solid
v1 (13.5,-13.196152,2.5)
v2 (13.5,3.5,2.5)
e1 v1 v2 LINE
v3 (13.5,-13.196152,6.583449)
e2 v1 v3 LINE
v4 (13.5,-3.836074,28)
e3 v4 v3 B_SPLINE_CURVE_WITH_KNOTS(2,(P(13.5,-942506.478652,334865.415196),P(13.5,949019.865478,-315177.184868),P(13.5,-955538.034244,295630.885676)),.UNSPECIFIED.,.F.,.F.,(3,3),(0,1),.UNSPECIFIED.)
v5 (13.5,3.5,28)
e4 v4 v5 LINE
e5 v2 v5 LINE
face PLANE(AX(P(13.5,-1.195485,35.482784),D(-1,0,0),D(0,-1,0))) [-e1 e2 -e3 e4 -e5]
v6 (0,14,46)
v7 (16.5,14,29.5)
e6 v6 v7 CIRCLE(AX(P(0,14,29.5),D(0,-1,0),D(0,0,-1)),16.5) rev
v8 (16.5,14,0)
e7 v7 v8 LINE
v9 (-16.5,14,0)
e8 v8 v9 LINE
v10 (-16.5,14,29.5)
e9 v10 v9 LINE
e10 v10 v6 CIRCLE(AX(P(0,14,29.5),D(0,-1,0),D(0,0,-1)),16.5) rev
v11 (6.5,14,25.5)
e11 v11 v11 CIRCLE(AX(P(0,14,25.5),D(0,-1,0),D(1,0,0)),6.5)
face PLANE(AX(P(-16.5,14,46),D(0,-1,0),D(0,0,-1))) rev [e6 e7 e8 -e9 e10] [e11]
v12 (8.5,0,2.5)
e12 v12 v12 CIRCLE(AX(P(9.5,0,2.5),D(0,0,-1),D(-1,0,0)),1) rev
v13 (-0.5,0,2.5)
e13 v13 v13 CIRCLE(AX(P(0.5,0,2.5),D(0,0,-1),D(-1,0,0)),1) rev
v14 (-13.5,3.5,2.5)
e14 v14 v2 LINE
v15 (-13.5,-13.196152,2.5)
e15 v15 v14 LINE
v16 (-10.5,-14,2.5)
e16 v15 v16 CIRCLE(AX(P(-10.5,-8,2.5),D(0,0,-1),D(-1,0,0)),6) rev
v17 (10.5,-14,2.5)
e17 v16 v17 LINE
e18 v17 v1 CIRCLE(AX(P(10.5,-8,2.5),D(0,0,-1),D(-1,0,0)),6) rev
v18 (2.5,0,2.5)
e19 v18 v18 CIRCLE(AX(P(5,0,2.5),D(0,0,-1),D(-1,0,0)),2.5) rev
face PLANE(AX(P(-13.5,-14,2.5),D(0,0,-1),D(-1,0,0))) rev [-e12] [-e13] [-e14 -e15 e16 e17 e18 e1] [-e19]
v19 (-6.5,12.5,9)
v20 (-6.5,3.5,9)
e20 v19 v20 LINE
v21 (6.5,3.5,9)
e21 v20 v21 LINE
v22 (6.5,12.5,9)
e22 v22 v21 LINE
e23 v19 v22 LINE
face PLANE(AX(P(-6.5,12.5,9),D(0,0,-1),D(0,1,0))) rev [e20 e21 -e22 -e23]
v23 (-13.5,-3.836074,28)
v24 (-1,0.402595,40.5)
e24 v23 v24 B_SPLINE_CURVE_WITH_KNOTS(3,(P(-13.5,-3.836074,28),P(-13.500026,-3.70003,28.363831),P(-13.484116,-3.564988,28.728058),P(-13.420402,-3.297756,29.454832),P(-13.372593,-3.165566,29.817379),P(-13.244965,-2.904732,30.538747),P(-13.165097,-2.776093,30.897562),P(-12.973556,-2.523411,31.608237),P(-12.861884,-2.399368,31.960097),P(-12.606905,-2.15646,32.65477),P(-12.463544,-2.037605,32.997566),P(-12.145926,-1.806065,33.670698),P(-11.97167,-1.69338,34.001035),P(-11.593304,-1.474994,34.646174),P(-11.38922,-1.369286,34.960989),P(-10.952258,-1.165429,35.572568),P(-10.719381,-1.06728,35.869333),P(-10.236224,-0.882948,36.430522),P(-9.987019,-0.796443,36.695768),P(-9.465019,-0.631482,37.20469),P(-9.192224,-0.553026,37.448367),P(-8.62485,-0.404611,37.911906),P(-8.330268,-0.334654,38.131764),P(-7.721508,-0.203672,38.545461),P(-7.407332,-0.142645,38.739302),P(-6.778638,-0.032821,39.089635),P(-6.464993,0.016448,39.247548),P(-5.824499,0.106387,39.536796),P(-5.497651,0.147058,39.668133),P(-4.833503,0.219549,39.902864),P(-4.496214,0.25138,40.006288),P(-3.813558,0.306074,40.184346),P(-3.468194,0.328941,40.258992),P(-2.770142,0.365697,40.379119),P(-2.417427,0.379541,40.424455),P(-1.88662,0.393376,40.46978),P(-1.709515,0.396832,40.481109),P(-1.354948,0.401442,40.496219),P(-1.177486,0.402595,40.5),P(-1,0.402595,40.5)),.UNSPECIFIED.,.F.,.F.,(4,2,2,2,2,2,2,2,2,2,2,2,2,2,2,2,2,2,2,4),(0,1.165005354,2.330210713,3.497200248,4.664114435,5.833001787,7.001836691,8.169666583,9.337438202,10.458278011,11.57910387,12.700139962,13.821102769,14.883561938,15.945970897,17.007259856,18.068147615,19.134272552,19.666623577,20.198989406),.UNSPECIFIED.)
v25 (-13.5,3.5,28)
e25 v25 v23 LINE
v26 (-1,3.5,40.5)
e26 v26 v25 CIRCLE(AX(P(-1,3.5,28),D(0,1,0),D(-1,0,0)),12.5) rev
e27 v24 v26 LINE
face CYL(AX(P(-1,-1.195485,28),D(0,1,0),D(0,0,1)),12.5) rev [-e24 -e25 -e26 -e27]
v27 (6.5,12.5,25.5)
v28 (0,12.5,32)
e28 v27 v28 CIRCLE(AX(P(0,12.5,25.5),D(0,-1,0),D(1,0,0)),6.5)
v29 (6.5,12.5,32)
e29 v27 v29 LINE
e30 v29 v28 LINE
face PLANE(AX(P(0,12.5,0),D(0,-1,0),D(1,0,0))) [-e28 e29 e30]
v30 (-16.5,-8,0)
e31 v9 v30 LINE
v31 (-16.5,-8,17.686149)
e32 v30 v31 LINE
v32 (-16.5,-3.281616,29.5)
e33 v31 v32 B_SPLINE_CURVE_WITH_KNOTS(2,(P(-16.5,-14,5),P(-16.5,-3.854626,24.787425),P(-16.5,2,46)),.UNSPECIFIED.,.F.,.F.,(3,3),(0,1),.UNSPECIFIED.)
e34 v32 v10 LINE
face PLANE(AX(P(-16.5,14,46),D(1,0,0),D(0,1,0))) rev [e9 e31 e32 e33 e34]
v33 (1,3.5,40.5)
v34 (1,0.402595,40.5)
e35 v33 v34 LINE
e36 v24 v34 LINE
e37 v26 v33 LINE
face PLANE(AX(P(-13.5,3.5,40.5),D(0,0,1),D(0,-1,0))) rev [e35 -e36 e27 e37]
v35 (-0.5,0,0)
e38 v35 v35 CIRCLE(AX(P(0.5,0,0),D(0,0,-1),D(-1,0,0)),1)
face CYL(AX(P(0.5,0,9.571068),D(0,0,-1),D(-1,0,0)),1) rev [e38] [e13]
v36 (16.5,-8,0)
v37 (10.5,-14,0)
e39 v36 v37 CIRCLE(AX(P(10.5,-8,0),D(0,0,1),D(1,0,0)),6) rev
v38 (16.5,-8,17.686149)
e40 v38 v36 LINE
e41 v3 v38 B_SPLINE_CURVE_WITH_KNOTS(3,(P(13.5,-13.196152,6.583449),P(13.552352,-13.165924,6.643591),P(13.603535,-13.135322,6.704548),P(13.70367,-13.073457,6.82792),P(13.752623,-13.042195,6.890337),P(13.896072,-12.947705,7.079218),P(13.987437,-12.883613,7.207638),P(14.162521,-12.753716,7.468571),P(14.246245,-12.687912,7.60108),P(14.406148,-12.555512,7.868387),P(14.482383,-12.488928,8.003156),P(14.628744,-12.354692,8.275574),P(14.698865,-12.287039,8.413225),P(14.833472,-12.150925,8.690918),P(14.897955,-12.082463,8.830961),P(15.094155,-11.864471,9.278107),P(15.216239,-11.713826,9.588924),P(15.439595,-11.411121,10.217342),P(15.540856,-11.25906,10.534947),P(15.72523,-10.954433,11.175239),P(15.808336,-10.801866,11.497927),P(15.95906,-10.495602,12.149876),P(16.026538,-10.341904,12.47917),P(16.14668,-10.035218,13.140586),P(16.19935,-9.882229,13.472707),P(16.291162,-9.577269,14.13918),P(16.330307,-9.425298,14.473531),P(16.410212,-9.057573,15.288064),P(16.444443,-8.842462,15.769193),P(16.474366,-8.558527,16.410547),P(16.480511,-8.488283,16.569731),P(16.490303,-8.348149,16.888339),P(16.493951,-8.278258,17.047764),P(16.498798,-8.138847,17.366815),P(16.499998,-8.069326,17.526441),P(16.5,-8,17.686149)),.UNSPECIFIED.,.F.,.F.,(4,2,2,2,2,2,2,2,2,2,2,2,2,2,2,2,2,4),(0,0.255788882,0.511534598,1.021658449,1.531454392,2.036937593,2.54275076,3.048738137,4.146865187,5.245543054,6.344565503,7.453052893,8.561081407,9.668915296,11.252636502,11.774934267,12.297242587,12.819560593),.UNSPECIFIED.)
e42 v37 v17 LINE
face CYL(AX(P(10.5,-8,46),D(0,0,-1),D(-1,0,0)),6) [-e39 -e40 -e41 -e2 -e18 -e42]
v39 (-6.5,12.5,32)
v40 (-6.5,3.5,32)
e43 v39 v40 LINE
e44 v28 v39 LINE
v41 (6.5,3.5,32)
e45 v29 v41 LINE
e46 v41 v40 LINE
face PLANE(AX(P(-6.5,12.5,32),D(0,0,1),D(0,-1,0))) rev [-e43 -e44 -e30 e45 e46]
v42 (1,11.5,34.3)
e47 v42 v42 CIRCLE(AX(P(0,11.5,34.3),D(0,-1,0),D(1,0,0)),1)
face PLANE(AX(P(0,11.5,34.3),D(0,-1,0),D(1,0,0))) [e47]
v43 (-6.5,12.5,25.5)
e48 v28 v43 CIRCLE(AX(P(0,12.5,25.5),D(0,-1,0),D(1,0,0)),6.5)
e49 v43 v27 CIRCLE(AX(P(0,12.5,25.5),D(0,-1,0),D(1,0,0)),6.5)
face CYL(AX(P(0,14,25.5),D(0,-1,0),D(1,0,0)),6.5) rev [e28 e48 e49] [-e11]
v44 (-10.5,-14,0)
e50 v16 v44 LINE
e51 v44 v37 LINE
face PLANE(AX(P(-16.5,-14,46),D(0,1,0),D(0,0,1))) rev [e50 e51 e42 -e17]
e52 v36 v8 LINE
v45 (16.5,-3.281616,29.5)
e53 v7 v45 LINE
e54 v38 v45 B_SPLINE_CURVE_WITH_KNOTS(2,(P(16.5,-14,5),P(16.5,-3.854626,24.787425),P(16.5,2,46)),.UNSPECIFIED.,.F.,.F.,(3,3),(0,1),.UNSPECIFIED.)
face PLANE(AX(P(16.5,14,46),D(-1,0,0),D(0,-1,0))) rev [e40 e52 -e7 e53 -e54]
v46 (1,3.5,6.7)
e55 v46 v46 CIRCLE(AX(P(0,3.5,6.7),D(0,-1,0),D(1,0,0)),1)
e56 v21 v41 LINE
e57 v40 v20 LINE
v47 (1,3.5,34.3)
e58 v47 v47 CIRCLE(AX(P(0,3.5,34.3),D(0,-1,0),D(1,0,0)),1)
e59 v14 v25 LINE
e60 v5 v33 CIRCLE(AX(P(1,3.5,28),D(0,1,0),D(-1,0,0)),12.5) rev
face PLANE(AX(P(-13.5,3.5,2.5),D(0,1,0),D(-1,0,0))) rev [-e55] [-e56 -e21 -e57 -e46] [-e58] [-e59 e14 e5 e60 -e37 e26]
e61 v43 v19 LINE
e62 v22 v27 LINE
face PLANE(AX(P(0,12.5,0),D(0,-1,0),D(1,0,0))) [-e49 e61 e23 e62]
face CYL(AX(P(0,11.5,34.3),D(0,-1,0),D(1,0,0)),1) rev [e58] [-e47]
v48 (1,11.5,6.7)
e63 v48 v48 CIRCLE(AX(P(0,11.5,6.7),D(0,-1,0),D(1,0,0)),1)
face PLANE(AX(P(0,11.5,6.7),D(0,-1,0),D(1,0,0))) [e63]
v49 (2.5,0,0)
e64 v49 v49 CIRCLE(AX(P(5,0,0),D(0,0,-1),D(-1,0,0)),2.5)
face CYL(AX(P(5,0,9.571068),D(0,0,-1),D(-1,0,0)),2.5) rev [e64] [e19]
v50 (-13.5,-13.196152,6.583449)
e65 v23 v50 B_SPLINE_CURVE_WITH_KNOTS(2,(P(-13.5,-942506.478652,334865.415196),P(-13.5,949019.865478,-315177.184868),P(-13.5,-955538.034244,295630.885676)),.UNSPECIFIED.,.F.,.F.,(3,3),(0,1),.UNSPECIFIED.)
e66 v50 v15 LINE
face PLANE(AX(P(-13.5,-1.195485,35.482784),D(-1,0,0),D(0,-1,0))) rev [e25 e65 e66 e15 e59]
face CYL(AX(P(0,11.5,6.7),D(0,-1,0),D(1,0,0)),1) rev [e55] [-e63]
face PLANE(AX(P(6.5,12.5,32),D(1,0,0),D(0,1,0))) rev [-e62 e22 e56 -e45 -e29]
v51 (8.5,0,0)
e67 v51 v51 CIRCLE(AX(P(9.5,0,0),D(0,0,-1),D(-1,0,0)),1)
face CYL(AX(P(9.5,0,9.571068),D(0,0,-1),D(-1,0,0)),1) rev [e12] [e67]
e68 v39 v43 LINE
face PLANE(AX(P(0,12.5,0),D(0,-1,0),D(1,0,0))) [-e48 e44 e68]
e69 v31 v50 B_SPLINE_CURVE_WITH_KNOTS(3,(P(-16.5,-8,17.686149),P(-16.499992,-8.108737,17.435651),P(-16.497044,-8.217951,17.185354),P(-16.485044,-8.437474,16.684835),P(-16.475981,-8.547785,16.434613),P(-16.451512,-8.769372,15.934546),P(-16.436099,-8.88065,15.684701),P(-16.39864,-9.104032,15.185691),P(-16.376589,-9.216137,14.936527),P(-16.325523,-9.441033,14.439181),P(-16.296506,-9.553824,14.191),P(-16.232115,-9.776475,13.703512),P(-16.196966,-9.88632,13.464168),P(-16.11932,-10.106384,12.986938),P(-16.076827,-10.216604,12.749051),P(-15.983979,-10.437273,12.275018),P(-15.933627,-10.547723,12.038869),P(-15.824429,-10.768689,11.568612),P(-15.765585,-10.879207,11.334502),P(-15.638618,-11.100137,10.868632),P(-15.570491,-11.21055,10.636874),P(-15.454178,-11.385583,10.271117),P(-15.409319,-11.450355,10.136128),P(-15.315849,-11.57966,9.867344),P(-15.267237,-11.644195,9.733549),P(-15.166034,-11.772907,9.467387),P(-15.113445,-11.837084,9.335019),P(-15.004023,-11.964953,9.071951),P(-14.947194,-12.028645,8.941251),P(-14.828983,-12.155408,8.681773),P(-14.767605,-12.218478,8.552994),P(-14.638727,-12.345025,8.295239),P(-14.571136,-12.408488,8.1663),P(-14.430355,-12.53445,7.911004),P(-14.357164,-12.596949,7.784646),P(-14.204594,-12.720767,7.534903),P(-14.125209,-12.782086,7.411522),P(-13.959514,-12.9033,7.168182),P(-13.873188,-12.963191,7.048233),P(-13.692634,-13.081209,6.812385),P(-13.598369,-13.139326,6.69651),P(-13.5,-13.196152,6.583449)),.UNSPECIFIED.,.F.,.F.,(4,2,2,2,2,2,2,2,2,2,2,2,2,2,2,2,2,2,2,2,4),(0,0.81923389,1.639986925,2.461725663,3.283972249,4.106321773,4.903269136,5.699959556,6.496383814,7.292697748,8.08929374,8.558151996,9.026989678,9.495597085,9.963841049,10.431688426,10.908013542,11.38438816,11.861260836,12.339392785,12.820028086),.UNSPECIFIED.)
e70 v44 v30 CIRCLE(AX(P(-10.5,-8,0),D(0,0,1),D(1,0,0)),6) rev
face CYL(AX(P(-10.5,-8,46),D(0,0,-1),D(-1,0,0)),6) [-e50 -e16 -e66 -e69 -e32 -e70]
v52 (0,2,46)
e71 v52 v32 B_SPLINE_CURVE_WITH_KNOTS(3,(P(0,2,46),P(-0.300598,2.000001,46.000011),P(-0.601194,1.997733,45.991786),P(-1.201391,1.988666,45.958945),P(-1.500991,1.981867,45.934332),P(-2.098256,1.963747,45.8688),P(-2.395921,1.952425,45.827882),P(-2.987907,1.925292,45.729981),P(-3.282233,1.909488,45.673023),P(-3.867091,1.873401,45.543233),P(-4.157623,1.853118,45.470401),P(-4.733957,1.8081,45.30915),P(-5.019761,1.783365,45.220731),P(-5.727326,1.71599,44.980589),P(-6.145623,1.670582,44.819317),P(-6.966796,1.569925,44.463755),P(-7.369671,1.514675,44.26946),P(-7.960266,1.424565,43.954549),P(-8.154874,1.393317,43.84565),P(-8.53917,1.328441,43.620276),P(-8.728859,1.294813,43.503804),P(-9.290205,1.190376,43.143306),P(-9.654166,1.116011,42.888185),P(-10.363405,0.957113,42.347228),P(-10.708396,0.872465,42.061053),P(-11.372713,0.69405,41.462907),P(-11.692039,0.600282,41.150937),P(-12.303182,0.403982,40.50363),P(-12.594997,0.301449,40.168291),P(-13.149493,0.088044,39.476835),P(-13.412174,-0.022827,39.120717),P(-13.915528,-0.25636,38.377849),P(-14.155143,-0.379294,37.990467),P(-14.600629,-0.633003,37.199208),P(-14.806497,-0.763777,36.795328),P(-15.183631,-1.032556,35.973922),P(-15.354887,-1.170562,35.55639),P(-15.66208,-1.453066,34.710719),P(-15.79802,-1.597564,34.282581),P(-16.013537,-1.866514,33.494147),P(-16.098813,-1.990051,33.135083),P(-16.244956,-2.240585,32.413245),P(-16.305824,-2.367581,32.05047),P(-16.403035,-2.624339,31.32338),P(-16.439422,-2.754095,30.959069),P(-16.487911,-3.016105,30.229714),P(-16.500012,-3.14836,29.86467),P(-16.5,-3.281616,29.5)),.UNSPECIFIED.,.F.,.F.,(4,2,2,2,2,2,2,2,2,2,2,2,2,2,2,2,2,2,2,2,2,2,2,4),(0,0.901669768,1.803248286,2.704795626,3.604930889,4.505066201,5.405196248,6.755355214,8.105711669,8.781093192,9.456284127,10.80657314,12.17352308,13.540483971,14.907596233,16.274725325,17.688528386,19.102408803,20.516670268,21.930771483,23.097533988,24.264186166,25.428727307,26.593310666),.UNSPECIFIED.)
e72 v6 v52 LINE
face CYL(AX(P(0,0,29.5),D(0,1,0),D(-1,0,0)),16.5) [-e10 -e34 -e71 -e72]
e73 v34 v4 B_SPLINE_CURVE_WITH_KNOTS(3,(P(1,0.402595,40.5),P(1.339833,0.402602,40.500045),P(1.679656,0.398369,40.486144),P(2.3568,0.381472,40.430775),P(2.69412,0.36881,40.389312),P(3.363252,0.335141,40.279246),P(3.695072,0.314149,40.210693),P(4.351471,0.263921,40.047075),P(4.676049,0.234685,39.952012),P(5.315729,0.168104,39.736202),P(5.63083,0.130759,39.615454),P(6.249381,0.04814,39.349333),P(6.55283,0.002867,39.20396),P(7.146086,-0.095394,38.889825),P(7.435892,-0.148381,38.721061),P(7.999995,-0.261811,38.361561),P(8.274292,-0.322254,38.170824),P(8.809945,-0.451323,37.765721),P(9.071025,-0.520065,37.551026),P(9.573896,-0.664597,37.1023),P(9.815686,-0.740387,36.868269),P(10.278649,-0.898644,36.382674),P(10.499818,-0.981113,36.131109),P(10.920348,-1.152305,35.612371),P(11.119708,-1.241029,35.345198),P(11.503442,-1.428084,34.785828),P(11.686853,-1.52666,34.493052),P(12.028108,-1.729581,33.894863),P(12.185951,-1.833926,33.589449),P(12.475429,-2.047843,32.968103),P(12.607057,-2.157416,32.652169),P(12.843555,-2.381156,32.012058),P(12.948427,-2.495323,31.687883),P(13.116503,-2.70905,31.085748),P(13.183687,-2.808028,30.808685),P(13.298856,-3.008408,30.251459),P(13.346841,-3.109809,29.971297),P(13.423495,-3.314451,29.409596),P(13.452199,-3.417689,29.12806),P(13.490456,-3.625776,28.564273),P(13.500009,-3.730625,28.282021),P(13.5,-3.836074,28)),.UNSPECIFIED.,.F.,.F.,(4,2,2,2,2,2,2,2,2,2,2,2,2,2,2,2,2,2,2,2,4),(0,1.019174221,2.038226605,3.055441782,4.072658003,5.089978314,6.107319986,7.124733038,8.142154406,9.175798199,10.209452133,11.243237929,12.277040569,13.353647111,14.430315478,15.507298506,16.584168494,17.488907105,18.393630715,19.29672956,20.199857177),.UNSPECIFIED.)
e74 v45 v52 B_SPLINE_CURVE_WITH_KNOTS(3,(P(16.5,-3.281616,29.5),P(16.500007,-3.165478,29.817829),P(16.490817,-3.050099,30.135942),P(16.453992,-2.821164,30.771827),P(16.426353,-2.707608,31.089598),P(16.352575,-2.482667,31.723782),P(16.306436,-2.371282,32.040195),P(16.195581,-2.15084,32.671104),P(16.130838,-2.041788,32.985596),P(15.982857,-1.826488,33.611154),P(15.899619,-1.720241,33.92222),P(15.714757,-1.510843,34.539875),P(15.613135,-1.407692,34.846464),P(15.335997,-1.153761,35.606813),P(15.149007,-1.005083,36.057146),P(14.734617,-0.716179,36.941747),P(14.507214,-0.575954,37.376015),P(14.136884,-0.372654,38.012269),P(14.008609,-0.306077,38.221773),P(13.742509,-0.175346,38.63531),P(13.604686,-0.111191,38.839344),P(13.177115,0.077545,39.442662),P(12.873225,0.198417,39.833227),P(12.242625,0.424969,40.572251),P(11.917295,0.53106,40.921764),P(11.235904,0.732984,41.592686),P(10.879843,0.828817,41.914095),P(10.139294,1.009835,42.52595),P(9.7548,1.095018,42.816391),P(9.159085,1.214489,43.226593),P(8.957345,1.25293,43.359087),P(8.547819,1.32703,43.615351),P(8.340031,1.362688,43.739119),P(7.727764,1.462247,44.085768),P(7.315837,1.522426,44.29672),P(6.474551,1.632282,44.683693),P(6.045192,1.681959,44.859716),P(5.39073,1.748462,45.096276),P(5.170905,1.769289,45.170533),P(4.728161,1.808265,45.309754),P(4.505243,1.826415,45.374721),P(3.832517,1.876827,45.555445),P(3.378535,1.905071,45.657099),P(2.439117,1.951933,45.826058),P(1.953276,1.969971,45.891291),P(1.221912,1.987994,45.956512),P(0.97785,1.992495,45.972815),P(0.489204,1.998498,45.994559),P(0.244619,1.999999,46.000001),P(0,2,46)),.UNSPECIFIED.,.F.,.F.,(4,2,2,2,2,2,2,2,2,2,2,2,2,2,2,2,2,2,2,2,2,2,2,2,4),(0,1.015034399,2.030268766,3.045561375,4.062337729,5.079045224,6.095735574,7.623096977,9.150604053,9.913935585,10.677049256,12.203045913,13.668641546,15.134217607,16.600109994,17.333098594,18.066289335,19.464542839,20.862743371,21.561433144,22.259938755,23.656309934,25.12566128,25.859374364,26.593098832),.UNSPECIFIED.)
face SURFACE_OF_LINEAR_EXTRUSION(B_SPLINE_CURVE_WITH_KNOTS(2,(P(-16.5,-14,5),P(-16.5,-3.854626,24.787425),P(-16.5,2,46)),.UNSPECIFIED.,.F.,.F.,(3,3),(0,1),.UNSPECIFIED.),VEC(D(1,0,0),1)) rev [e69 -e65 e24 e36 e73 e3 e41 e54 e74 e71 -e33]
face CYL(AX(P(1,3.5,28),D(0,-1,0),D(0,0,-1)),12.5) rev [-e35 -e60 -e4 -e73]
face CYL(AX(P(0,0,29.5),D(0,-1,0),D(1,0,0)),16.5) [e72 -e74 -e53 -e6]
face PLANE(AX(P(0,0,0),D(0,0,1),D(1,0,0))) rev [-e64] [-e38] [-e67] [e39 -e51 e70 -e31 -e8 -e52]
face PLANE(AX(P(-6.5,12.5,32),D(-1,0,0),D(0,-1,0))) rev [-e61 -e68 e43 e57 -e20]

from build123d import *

# Parameters (mm, degrees)
SKETCH1_W           = 33
SKETCH1_H           = 28
BOSS_EXTRUDE1_DEPTH = 46
CUT_EXTRUDE2_DEPTH  = 59.318093247
CUT_EXTRUDE3_START  = -3
CUT_EXTRUDE3_DEPTH  = 27
FILLET1_R           = 12.5
FILLET2_R           = 16.5
FILLET3_R           = 6
SKETCH4_W           = 13
SKETCH4_H           = 23
CUT_EXTRUDE4_DEPTH  = 9
SKETCH5_R           = 6.5
CUT_EXTRUDE5_DEPTH  = 56.592265809
SKETCH6_R           = 1
CUT_EXTRUDE6_DEPTH  = 8
SKETCH7_R           = 1
SKETCH7_R_2         = 2.5
CUT_EXTRUDE7_DEPTH  = 2.5


with BuildPart() as part:
    # Sketch1 → Boss-Extrude1 (new body)
    with BuildSketch(Plane.XY):
        Rectangle(SKETCH1_W, SKETCH1_H)
    extrude(amount=BOSS_EXTRUDE1_DEPTH)

    # Sketch2 → Cut-Extrude2 (cut, through all)
    with BuildSketch(Plane(origin=(16.5, 0, 0), x_dir=(0, 0, -1), z_dir=(1, 0, 0))):
        with BuildLine():
            Line((-46, 2), (-46, -14))
            Line((-46, -14), (-5, -14))
            add(Edge.make_bspline(
                [(-5, -14), (-24.787424695, -3.854626285), (-46, 2)],
                knots=[0, 0, 0, 1, 1, 1], degree=2))
        make_face()
    extrude(amount=-CUT_EXTRUDE2_DEPTH, mode=Mode.SUBTRACT)

    # Sketch3 → Cut-Extrude3 (cut)
    with BuildSketch(Plane(origin=(16.5, 0, 0), x_dir=(0, 0, -1), z_dir=(1, 0, 0)).offset(CUT_EXTRUDE3_START)):
        with BuildLine():
            Line((-5, -14), (-2.5, -14))
            Line((-2.5, -14), (-2.5, 3.5))
            Line((-2.5, 3.5), (-40.5, 3.5))
            Line((-40.5, 3.5), (-40.5, 0.402594989))
            add(Edge.make_bspline(
                [(-5, -14), (-22.210911626, -5.175651551), (-40.5, 0.402594989)],
                knots=[0, 0, 0, 1, 1, 1], degree=2))
        make_face()
    extrude(amount=-CUT_EXTRUDE3_DEPTH, mode=Mode.SUBTRACT)

    # Fillet1
    fillet1_edges = [part.edges().sort_by_distance(p)[0] for p in [
        (13.5, 1.951297494, 40.5),
        (-13.5, 1.951297494, 40.5),
    ]]
    fillet(fillet1_edges, radius=FILLET1_R)

    # Fillet2
    fillet2_edges = [part.edges().sort_by_distance(p)[0] for p in [
        (16.5, 8, 46),
        (-16.5, 8, 46),
    ]]
    fillet(fillet2_edges, radius=FILLET2_R - 0.0001)  # a hair under: the kernel refuses the full size

    # Fillet3
    fillet3_edges = [part.edges().sort_by_distance(p)[0] for p in [
        (16.5, -14, 2.5),
        (-16.5, -14, 2.5),
    ]]
    fillet(fillet3_edges, radius=FILLET3_R)

    # Sketch4 → Cut-Extrude4 (cut)
    with BuildSketch(Plane.XZ.offset(-3.5)):
        with Locations((0, 20.5)):
            Rectangle(SKETCH4_W, SKETCH4_H)
    extrude(amount=-CUT_EXTRUDE4_DEPTH, mode=Mode.SUBTRACT)

    # Sketch5 → Cut-Extrude5 (cut, through all)
    with BuildSketch(Plane.XZ.offset(-12.5)):
        with Locations((0, 25.5)):
            Circle(SKETCH5_R)
    extrude(amount=-CUT_EXTRUDE5_DEPTH, mode=Mode.SUBTRACT)

    # Sketch6 → Cut-Extrude6 (cut)
    with BuildSketch(Plane.XZ.offset(-3.5)):
        with Locations((0, 34.3)):
            Circle(SKETCH6_R)
        with Locations((0, 6.7)):
            Circle(SKETCH6_R)
    extrude(amount=-CUT_EXTRUDE6_DEPTH, mode=Mode.SUBTRACT)

    # Sketch7 → Cut-Extrude7 (cut)
    with BuildSketch(Plane(origin=(0, 0, 0), x_dir=(-1, 0, 0), z_dir=(0, 0, -1))):
        with Locations((-9.5, 0)):
            Circle(SKETCH7_R)
        with Locations((-5, 0)):
            Circle(SKETCH7_R_2)
        with Locations((-0.5, 0)):
            Circle(SKETCH7_R)
    extrude(amount=-CUT_EXTRUDE7_DEPTH, mode=Mode.SUBTRACT)


solid = part.part
